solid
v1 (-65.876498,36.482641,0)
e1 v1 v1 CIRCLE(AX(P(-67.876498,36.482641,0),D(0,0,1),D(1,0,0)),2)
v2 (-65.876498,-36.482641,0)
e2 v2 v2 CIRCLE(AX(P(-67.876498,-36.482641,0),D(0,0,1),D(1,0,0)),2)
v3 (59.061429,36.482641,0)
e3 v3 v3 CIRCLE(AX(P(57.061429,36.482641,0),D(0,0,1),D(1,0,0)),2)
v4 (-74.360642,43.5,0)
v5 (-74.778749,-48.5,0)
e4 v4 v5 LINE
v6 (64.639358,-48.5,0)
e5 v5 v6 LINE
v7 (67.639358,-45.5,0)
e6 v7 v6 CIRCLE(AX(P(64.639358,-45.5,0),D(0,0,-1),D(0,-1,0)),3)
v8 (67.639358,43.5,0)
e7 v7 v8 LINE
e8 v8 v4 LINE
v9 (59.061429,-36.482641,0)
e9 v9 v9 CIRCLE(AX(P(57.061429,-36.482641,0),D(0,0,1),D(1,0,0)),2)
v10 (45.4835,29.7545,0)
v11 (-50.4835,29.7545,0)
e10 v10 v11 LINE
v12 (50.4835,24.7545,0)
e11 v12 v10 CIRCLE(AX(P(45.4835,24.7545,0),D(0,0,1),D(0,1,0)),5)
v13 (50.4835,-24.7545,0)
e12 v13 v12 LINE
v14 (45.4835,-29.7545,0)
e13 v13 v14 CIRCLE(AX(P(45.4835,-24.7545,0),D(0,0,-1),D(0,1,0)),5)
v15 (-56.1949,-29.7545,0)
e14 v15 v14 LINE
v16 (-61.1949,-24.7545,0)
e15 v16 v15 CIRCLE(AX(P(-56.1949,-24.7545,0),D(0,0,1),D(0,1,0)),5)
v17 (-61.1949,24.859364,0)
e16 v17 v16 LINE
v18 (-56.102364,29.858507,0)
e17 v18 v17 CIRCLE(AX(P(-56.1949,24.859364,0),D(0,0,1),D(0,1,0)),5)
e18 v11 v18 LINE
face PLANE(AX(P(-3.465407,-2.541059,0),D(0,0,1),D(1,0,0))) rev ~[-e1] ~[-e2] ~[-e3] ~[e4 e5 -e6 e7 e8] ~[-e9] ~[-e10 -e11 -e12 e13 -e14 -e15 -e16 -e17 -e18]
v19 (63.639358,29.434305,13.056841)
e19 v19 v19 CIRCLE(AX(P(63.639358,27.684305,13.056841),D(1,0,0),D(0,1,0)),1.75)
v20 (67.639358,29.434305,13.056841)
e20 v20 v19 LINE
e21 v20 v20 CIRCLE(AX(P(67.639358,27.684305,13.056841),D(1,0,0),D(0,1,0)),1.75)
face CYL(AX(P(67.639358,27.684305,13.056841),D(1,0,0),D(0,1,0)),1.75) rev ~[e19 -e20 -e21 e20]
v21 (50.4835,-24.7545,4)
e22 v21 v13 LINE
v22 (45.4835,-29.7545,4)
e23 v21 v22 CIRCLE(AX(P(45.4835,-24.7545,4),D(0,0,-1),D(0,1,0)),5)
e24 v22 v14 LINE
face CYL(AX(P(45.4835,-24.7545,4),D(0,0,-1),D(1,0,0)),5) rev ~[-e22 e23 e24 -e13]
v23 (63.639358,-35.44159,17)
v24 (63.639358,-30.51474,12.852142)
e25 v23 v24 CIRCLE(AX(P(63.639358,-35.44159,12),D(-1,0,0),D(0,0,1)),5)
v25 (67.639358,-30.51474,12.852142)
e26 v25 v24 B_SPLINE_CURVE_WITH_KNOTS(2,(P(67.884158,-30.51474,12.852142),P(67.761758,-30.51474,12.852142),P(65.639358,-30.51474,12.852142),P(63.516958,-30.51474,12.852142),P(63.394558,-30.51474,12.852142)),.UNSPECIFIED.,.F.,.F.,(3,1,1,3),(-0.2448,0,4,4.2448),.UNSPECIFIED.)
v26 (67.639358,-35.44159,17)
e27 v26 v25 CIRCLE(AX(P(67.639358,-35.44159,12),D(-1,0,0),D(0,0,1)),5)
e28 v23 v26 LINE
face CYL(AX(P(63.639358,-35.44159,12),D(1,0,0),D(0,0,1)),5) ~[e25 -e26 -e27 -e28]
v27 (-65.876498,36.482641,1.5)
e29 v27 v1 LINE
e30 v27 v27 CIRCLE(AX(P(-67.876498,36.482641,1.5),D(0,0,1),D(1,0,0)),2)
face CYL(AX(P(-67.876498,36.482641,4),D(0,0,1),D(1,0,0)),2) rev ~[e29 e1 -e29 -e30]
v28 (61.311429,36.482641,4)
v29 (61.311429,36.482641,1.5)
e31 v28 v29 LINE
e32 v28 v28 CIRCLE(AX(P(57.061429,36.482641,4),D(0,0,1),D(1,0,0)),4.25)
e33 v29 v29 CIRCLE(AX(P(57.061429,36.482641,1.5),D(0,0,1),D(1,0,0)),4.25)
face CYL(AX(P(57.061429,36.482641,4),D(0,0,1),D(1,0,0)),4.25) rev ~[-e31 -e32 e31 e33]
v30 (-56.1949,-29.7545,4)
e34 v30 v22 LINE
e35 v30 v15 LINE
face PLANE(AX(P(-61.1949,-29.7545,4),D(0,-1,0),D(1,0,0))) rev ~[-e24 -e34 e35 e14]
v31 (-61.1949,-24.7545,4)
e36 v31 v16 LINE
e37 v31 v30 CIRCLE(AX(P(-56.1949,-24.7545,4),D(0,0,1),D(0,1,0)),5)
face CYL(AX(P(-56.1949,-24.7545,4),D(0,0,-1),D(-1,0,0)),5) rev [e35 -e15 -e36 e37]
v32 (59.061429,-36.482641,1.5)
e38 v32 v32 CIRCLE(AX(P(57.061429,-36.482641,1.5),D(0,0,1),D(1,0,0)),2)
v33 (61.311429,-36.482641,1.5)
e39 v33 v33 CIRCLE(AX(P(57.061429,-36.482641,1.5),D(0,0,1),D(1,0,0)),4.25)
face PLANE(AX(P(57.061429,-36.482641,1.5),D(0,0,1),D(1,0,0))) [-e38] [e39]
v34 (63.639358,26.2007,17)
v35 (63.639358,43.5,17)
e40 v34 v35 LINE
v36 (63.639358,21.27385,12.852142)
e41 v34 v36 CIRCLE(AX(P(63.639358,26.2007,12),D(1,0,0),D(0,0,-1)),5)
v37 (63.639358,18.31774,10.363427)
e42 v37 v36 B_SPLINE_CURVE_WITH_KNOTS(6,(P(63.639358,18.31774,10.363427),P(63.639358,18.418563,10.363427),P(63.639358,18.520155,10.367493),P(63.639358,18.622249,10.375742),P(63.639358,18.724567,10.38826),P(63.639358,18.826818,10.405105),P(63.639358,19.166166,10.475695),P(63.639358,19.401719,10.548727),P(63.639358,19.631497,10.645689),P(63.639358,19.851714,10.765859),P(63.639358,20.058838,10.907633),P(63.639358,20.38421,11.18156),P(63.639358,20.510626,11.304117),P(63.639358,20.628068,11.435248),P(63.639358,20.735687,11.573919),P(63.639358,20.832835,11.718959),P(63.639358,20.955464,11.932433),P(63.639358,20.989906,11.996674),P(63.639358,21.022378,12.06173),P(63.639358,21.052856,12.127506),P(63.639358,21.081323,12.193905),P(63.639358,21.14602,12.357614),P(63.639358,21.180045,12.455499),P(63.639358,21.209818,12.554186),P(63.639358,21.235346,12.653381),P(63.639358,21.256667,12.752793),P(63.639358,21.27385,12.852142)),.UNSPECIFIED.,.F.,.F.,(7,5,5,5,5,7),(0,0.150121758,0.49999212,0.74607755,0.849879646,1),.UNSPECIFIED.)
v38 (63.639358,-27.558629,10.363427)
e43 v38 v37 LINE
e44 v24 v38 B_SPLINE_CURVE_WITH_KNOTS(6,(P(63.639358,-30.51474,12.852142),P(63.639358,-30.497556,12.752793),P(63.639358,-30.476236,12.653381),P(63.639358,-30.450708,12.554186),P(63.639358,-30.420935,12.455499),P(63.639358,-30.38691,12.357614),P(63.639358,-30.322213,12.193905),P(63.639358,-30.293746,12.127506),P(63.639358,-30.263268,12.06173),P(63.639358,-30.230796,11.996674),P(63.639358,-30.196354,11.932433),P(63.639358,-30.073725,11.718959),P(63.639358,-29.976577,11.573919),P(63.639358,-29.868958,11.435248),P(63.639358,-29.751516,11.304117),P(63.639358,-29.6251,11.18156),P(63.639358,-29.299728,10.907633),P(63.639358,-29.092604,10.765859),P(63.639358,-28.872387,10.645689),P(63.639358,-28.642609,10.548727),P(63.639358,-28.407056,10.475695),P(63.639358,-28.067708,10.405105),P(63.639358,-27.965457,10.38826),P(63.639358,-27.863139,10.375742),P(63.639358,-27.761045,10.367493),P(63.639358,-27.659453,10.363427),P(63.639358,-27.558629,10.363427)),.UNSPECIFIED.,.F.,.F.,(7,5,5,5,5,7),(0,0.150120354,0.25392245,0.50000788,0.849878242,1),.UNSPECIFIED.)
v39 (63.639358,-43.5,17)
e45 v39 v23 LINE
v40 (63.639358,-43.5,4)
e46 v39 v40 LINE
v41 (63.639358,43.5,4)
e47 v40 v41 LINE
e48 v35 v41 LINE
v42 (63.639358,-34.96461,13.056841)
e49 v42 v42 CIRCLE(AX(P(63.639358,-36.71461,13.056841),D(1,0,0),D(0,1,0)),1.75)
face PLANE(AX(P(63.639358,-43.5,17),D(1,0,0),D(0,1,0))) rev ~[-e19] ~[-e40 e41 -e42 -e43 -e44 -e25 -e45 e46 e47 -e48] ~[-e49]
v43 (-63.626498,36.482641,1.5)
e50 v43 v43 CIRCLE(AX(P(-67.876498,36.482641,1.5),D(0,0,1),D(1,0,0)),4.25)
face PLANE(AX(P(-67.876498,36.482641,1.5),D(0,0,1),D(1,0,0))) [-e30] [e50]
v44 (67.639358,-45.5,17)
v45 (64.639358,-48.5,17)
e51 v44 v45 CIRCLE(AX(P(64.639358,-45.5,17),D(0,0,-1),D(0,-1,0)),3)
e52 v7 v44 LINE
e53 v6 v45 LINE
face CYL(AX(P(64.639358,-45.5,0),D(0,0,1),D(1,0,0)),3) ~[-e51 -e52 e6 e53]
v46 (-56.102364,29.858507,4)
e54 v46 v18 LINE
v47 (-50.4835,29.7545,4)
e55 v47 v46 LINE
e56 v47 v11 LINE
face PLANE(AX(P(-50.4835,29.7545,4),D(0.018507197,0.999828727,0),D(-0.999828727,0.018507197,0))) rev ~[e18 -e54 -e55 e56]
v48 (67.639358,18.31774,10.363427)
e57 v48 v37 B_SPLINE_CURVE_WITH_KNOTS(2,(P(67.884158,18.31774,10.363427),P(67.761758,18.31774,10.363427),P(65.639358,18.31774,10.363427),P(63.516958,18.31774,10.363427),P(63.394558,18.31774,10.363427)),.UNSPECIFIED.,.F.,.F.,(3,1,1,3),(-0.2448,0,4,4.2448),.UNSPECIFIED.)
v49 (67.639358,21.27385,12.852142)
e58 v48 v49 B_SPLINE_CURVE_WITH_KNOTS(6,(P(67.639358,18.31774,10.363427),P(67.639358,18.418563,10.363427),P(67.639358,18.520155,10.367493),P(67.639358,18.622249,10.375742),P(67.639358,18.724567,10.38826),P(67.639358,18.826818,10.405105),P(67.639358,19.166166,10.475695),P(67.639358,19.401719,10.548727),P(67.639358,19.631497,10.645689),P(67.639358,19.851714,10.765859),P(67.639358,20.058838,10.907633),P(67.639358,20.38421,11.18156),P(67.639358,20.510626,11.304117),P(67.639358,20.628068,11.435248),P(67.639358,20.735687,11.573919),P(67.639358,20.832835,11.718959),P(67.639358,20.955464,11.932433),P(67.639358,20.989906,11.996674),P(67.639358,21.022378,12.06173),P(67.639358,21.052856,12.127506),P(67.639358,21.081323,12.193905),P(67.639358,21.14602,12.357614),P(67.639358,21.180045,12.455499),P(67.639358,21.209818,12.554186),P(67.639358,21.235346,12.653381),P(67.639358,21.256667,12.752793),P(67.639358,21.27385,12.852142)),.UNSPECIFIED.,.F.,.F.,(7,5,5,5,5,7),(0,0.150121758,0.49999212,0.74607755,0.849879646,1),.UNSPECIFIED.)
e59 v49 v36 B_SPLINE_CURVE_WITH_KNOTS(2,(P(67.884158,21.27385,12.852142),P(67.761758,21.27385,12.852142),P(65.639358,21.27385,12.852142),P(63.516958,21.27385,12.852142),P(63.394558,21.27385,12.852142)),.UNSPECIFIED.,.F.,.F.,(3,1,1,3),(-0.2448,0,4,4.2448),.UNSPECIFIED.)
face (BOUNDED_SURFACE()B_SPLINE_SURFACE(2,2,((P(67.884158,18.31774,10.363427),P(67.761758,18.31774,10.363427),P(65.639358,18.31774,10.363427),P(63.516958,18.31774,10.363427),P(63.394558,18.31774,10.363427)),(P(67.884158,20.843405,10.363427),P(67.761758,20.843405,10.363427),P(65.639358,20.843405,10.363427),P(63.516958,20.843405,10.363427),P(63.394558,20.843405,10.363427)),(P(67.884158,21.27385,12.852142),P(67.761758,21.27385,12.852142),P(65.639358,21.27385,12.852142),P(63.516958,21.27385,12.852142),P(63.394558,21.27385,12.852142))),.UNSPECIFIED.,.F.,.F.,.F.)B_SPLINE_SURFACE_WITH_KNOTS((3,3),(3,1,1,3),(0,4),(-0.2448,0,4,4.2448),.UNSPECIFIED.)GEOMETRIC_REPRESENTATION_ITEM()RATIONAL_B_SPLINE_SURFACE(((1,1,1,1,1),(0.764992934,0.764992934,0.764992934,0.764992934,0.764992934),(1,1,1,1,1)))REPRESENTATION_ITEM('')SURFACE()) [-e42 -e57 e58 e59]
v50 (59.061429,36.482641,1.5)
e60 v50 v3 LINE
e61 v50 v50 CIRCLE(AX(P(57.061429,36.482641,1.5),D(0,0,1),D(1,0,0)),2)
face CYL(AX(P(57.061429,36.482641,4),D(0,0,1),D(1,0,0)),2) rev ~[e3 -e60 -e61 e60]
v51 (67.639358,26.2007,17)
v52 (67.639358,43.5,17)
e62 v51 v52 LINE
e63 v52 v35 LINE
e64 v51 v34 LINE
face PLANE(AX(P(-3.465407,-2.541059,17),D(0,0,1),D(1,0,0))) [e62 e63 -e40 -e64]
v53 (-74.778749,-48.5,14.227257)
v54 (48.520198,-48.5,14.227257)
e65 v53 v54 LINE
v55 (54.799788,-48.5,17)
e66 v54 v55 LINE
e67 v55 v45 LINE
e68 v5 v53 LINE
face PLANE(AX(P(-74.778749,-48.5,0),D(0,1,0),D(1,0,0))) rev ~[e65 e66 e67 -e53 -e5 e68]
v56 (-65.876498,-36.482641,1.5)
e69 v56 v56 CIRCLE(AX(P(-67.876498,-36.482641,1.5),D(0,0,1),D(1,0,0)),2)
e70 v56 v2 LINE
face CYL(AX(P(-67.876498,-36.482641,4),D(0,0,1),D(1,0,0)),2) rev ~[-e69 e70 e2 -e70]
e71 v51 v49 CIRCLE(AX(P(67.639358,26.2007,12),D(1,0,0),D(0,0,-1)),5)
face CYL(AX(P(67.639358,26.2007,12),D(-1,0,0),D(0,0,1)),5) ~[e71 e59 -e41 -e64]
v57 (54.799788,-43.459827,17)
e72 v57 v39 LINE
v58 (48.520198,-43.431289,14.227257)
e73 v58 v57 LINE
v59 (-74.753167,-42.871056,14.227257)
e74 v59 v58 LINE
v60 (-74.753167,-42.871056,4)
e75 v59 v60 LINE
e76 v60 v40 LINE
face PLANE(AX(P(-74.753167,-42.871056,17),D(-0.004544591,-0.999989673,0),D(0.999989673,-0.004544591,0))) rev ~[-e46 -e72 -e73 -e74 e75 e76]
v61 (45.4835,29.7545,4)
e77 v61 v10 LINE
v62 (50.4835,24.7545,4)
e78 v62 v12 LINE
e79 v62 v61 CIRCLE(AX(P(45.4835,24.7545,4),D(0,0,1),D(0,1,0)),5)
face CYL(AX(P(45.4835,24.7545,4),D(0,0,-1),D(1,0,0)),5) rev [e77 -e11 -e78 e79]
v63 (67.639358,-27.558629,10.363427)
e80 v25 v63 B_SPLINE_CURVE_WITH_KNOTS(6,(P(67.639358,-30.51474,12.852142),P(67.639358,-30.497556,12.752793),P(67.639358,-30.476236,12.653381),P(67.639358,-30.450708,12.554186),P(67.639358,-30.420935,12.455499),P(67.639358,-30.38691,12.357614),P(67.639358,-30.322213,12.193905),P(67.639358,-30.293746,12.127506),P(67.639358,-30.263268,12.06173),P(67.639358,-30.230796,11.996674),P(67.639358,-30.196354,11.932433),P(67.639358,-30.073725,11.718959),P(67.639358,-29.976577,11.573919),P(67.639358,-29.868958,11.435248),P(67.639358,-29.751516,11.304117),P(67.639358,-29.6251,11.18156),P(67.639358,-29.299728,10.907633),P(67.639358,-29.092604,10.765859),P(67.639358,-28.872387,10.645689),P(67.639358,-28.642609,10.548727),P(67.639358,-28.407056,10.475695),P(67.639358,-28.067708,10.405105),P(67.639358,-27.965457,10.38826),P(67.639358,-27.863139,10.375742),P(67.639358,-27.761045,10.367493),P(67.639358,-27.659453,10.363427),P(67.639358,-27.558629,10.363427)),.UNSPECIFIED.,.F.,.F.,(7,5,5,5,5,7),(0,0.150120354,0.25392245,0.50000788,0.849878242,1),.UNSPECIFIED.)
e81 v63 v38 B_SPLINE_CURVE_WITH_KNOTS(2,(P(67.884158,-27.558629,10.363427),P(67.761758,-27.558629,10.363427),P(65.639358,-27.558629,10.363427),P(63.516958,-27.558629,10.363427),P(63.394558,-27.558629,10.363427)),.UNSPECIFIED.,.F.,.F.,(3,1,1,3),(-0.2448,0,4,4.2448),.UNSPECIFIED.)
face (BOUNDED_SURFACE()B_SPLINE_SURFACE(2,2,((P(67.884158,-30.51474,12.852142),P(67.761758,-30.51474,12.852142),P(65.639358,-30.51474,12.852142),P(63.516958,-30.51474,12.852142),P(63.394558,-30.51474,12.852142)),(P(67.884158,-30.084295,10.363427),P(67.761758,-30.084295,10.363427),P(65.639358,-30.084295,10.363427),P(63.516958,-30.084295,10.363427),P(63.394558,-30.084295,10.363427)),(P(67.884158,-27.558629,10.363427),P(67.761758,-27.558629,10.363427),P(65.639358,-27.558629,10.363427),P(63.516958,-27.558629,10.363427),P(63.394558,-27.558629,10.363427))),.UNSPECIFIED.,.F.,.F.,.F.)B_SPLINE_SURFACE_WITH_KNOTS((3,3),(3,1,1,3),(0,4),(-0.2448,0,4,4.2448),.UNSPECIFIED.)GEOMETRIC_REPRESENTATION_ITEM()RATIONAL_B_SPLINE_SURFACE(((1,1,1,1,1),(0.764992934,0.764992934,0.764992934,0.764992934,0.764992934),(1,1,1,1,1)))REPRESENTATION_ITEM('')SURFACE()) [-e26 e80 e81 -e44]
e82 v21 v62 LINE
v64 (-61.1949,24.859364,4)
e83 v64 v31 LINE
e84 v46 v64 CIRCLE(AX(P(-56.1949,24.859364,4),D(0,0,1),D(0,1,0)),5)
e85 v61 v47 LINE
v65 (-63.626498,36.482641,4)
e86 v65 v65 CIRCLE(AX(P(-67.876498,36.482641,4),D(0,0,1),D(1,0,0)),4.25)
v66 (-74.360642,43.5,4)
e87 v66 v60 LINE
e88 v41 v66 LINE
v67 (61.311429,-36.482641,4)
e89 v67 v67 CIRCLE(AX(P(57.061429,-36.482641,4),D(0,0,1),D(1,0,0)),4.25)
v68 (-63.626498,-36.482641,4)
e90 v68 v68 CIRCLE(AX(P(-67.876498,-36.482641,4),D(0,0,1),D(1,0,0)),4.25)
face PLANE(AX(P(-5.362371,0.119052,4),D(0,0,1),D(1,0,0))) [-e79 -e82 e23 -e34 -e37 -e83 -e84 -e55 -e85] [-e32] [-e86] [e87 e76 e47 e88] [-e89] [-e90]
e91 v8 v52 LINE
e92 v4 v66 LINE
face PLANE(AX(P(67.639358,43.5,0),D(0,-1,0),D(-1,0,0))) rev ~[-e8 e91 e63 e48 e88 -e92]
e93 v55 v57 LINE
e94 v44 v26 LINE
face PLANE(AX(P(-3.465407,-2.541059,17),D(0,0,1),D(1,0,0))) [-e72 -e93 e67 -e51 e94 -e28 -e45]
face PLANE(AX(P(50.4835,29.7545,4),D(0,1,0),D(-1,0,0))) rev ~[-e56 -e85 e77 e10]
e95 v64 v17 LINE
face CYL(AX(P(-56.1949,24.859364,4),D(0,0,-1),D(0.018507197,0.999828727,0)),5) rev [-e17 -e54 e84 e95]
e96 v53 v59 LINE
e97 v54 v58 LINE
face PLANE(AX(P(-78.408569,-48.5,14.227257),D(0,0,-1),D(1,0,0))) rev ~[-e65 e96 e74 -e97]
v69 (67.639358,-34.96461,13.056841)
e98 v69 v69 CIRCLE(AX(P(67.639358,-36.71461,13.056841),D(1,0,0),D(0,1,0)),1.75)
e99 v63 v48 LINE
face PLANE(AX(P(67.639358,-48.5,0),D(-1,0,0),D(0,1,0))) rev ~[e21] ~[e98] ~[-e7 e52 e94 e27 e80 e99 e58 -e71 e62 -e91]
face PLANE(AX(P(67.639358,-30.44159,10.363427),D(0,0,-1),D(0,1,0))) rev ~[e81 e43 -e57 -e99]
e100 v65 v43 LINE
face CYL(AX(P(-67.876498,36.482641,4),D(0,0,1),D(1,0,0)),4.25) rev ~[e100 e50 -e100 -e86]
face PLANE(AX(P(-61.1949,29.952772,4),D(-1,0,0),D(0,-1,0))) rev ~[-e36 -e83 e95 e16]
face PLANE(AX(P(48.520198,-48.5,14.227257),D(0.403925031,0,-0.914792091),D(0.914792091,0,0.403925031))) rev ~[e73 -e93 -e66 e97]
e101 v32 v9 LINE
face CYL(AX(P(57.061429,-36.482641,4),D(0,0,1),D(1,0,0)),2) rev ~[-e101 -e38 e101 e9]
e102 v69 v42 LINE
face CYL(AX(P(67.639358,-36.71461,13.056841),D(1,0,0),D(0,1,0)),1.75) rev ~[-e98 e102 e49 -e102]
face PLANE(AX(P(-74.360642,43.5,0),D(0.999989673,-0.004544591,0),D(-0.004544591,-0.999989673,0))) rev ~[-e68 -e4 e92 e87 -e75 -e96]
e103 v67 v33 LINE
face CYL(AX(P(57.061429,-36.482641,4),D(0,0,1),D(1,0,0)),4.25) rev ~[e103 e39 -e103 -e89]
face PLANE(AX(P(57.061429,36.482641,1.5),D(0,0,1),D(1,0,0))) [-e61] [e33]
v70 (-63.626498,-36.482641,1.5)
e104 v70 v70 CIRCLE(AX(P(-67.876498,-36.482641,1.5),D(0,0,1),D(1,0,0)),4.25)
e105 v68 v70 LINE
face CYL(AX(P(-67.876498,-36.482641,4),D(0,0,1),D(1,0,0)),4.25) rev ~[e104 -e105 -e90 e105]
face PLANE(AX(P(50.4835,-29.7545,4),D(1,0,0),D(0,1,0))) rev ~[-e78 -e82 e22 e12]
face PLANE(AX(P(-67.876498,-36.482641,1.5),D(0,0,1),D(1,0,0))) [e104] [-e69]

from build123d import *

# Parameters (mm, degrees)
F1_DEPTH  = 17
F3_DEPTH  = 13
F5_R      = 1.75
F6_DEPTH  = 7
F8_DEPTH  = 25
F9_R      = 3
F10_R     = 5
F11_R     = 2
F12_DEPTH = 25
F13_R     = 4.25
F14_DEPTH = 2.5
F16_DEPTH = 25
F17_R     = 5
F18_R     = 3


# Not quite as in the source:
# - ends of sketch curves that miss each other by under 0.0002 mm in the source are joined
# - a feature names something its author has since deleted; it is built from what else it names


with BuildPart() as f1:
    # F0 (on Top) → F1 (new body)
    with BuildSketch(Plane.XY):
        Polygon((67.6393576576, 43.5), (-74.3606423424, 43.5), (-74.7787490059, -48.5), (67.6393576576, -48.5), align=None)
    extrude(amount=F1_DEPTH)

    # F2 (on face) → F3 (cut)
    with BuildSketch(Plane.XY.offset(17)):
        Polygon((63.6393576576, 43.5), (-74.3606423424, 43.5), (-74.7531674957, -42.8710561201), (63.6393576576, -43.5), align=None)
    extrude(amount=-F3_DEPTH, mode=Mode.SUBTRACT)

    # F5 (on face) → F6 (cut)
    with BuildSketch(Plane.YZ.offset(67.6393576576)):
        with Locations((27.6843051805, 13.0568410139)):
            Circle(F5_R)
        with Locations((-36.7146101537, 13.0568410233)):
            Circle(F5_R)
        with BuildLine():
            ThreePointArc((27.6607478596, 17.0567716449), (27.6840839728, 17.0568410078), (27.7074200936, 17.0567742259))
            Line((27.7074200936, 17.0567742259), (47.12958325, 17.057848309))
            Line((47.12958325, 17.057848309), (47.1295543691, 17.7527777587))
            Line((47.1295543691, 17.7527777587), (48.6345604738, 26.1808149253))
            Line((48.6345604738, 26.1808149253), (32.3804893276, 26.9834864621))
            Line((32.3804893276, 26.9834864621), (-57.0169261912, 27.2844880555))
            Line((-57.0169261912, 27.2844880555), (-57.1818195967, 17.0567789567))
            Line((-57.1818195967, 17.0567789567), (-36.7146222837, 17.0568410232))
            Line((-36.7146222837, 17.0568410232), (-30.4415900066, 17.0568410232))
            Line((-30.4415900066, 17.0568410232), (-30.4415900066, 10.3634270296))
            Line((-30.4415900066, 10.3634270296), (21.2007000848, 10.3634270296))
            Line((21.2007000848, 10.3634270296), (21.2007000848, 17.0567742259))
            Line((21.2007000848, 17.0567742259), (27.6607478596, 17.0567716449))
        make_face()
    extrude(amount=-F6_DEPTH, mode=Mode.SUBTRACT)

    # F7 (on face) → F8 (cut)
    with BuildSketch(Plane.XY.offset(4)):
        Polygon((-50.4835, -29.7545), (50.4835, -29.7545), (50.4835, 29.7545), (-50.4835, 29.7545), (-61.1949004233, 29.9527719617), (-61.1949004233, -29.7545), align=None)
    extrude(amount=-F8_DEPTH, mode=Mode.SUBTRACT)

    # F9
    f9_edges = [f1.edges().sort_by_distance(p)[0] for p in [
        (67.639358, -48.5, 8.5),
    ]]
    fillet(f9_edges, radius=F9_R)

    # F10
    f10_edges = [f1.edges().sort_by_distance(p)[0] for p in [
        (50.4835, 29.7545, 2),
        (-61.1949, 29.952772, 2),
        (50.4835, -29.7545, 2),
        (-61.1949, -29.7545, 2),
    ]]
    fillet(f10_edges, radius=F10_R)

    # F11 (on face) → F12 (cut)
    with BuildSketch(Plane.XY.offset(4)):
        with Locations((-67.8764981099, -36.4826410897)):
            Circle(F11_R)
        with Locations((57.0614288288, -36.4826410897)):
            Circle(F11_R)
        with Locations((-67.8764981099, 36.4826410897)):
            Circle(F11_R)
        with Locations((57.0614288288, 36.4826410897)):
            Circle(F11_R)
    extrude(amount=-F12_DEPTH, mode=Mode.SUBTRACT)

    # F13 (on face) → F14 (cut)
    with BuildSketch(Plane.XY.offset(4)):
        with Locations((-67.8764981099, 36.4826410897)):
            Circle(F13_R)
        with Locations((57.0614288288, 36.4826410897)):
            Circle(F13_R)
        with Locations((-67.8764981099, -36.4826410897)):
            Circle(F13_R)
        with Locations((57.0614288288, -36.4826410897)):
            Circle(F13_R)
    extrude(amount=-F14_DEPTH, mode=Mode.SUBTRACT)

    # F15 (on face) → F16 (cut)
    with BuildSketch(Plane.XZ.offset(48.5)):
        Polygon((-78.4085690975, 22.2279634327), (-78.4085690975, 14.2272571102), (48.5201984959, 14.2272571102), (54.7997877002, 17), (47.9935184121, 22.2279634327), align=None)
    extrude(amount=-F16_DEPTH, mode=Mode.SUBTRACT)

    # F17
    f17_edges = [f1.edges().sort_by_distance(p)[0] for p in [
        (65.639358, -30.44159, 17),
        (65.639358, 21.2007, 17),
    ]]
    fillet(f17_edges, radius=F17_R)

    # F18
    f18_edges = [f1.edges().sort_by_distance(p)[0] for p in [
        (65.639358, -30.44159, 10.363427),
        (65.639358, 21.2007, 10.363427),
    ]]
    fillet(f18_edges, radius=F18_R)


solid = f1.part
